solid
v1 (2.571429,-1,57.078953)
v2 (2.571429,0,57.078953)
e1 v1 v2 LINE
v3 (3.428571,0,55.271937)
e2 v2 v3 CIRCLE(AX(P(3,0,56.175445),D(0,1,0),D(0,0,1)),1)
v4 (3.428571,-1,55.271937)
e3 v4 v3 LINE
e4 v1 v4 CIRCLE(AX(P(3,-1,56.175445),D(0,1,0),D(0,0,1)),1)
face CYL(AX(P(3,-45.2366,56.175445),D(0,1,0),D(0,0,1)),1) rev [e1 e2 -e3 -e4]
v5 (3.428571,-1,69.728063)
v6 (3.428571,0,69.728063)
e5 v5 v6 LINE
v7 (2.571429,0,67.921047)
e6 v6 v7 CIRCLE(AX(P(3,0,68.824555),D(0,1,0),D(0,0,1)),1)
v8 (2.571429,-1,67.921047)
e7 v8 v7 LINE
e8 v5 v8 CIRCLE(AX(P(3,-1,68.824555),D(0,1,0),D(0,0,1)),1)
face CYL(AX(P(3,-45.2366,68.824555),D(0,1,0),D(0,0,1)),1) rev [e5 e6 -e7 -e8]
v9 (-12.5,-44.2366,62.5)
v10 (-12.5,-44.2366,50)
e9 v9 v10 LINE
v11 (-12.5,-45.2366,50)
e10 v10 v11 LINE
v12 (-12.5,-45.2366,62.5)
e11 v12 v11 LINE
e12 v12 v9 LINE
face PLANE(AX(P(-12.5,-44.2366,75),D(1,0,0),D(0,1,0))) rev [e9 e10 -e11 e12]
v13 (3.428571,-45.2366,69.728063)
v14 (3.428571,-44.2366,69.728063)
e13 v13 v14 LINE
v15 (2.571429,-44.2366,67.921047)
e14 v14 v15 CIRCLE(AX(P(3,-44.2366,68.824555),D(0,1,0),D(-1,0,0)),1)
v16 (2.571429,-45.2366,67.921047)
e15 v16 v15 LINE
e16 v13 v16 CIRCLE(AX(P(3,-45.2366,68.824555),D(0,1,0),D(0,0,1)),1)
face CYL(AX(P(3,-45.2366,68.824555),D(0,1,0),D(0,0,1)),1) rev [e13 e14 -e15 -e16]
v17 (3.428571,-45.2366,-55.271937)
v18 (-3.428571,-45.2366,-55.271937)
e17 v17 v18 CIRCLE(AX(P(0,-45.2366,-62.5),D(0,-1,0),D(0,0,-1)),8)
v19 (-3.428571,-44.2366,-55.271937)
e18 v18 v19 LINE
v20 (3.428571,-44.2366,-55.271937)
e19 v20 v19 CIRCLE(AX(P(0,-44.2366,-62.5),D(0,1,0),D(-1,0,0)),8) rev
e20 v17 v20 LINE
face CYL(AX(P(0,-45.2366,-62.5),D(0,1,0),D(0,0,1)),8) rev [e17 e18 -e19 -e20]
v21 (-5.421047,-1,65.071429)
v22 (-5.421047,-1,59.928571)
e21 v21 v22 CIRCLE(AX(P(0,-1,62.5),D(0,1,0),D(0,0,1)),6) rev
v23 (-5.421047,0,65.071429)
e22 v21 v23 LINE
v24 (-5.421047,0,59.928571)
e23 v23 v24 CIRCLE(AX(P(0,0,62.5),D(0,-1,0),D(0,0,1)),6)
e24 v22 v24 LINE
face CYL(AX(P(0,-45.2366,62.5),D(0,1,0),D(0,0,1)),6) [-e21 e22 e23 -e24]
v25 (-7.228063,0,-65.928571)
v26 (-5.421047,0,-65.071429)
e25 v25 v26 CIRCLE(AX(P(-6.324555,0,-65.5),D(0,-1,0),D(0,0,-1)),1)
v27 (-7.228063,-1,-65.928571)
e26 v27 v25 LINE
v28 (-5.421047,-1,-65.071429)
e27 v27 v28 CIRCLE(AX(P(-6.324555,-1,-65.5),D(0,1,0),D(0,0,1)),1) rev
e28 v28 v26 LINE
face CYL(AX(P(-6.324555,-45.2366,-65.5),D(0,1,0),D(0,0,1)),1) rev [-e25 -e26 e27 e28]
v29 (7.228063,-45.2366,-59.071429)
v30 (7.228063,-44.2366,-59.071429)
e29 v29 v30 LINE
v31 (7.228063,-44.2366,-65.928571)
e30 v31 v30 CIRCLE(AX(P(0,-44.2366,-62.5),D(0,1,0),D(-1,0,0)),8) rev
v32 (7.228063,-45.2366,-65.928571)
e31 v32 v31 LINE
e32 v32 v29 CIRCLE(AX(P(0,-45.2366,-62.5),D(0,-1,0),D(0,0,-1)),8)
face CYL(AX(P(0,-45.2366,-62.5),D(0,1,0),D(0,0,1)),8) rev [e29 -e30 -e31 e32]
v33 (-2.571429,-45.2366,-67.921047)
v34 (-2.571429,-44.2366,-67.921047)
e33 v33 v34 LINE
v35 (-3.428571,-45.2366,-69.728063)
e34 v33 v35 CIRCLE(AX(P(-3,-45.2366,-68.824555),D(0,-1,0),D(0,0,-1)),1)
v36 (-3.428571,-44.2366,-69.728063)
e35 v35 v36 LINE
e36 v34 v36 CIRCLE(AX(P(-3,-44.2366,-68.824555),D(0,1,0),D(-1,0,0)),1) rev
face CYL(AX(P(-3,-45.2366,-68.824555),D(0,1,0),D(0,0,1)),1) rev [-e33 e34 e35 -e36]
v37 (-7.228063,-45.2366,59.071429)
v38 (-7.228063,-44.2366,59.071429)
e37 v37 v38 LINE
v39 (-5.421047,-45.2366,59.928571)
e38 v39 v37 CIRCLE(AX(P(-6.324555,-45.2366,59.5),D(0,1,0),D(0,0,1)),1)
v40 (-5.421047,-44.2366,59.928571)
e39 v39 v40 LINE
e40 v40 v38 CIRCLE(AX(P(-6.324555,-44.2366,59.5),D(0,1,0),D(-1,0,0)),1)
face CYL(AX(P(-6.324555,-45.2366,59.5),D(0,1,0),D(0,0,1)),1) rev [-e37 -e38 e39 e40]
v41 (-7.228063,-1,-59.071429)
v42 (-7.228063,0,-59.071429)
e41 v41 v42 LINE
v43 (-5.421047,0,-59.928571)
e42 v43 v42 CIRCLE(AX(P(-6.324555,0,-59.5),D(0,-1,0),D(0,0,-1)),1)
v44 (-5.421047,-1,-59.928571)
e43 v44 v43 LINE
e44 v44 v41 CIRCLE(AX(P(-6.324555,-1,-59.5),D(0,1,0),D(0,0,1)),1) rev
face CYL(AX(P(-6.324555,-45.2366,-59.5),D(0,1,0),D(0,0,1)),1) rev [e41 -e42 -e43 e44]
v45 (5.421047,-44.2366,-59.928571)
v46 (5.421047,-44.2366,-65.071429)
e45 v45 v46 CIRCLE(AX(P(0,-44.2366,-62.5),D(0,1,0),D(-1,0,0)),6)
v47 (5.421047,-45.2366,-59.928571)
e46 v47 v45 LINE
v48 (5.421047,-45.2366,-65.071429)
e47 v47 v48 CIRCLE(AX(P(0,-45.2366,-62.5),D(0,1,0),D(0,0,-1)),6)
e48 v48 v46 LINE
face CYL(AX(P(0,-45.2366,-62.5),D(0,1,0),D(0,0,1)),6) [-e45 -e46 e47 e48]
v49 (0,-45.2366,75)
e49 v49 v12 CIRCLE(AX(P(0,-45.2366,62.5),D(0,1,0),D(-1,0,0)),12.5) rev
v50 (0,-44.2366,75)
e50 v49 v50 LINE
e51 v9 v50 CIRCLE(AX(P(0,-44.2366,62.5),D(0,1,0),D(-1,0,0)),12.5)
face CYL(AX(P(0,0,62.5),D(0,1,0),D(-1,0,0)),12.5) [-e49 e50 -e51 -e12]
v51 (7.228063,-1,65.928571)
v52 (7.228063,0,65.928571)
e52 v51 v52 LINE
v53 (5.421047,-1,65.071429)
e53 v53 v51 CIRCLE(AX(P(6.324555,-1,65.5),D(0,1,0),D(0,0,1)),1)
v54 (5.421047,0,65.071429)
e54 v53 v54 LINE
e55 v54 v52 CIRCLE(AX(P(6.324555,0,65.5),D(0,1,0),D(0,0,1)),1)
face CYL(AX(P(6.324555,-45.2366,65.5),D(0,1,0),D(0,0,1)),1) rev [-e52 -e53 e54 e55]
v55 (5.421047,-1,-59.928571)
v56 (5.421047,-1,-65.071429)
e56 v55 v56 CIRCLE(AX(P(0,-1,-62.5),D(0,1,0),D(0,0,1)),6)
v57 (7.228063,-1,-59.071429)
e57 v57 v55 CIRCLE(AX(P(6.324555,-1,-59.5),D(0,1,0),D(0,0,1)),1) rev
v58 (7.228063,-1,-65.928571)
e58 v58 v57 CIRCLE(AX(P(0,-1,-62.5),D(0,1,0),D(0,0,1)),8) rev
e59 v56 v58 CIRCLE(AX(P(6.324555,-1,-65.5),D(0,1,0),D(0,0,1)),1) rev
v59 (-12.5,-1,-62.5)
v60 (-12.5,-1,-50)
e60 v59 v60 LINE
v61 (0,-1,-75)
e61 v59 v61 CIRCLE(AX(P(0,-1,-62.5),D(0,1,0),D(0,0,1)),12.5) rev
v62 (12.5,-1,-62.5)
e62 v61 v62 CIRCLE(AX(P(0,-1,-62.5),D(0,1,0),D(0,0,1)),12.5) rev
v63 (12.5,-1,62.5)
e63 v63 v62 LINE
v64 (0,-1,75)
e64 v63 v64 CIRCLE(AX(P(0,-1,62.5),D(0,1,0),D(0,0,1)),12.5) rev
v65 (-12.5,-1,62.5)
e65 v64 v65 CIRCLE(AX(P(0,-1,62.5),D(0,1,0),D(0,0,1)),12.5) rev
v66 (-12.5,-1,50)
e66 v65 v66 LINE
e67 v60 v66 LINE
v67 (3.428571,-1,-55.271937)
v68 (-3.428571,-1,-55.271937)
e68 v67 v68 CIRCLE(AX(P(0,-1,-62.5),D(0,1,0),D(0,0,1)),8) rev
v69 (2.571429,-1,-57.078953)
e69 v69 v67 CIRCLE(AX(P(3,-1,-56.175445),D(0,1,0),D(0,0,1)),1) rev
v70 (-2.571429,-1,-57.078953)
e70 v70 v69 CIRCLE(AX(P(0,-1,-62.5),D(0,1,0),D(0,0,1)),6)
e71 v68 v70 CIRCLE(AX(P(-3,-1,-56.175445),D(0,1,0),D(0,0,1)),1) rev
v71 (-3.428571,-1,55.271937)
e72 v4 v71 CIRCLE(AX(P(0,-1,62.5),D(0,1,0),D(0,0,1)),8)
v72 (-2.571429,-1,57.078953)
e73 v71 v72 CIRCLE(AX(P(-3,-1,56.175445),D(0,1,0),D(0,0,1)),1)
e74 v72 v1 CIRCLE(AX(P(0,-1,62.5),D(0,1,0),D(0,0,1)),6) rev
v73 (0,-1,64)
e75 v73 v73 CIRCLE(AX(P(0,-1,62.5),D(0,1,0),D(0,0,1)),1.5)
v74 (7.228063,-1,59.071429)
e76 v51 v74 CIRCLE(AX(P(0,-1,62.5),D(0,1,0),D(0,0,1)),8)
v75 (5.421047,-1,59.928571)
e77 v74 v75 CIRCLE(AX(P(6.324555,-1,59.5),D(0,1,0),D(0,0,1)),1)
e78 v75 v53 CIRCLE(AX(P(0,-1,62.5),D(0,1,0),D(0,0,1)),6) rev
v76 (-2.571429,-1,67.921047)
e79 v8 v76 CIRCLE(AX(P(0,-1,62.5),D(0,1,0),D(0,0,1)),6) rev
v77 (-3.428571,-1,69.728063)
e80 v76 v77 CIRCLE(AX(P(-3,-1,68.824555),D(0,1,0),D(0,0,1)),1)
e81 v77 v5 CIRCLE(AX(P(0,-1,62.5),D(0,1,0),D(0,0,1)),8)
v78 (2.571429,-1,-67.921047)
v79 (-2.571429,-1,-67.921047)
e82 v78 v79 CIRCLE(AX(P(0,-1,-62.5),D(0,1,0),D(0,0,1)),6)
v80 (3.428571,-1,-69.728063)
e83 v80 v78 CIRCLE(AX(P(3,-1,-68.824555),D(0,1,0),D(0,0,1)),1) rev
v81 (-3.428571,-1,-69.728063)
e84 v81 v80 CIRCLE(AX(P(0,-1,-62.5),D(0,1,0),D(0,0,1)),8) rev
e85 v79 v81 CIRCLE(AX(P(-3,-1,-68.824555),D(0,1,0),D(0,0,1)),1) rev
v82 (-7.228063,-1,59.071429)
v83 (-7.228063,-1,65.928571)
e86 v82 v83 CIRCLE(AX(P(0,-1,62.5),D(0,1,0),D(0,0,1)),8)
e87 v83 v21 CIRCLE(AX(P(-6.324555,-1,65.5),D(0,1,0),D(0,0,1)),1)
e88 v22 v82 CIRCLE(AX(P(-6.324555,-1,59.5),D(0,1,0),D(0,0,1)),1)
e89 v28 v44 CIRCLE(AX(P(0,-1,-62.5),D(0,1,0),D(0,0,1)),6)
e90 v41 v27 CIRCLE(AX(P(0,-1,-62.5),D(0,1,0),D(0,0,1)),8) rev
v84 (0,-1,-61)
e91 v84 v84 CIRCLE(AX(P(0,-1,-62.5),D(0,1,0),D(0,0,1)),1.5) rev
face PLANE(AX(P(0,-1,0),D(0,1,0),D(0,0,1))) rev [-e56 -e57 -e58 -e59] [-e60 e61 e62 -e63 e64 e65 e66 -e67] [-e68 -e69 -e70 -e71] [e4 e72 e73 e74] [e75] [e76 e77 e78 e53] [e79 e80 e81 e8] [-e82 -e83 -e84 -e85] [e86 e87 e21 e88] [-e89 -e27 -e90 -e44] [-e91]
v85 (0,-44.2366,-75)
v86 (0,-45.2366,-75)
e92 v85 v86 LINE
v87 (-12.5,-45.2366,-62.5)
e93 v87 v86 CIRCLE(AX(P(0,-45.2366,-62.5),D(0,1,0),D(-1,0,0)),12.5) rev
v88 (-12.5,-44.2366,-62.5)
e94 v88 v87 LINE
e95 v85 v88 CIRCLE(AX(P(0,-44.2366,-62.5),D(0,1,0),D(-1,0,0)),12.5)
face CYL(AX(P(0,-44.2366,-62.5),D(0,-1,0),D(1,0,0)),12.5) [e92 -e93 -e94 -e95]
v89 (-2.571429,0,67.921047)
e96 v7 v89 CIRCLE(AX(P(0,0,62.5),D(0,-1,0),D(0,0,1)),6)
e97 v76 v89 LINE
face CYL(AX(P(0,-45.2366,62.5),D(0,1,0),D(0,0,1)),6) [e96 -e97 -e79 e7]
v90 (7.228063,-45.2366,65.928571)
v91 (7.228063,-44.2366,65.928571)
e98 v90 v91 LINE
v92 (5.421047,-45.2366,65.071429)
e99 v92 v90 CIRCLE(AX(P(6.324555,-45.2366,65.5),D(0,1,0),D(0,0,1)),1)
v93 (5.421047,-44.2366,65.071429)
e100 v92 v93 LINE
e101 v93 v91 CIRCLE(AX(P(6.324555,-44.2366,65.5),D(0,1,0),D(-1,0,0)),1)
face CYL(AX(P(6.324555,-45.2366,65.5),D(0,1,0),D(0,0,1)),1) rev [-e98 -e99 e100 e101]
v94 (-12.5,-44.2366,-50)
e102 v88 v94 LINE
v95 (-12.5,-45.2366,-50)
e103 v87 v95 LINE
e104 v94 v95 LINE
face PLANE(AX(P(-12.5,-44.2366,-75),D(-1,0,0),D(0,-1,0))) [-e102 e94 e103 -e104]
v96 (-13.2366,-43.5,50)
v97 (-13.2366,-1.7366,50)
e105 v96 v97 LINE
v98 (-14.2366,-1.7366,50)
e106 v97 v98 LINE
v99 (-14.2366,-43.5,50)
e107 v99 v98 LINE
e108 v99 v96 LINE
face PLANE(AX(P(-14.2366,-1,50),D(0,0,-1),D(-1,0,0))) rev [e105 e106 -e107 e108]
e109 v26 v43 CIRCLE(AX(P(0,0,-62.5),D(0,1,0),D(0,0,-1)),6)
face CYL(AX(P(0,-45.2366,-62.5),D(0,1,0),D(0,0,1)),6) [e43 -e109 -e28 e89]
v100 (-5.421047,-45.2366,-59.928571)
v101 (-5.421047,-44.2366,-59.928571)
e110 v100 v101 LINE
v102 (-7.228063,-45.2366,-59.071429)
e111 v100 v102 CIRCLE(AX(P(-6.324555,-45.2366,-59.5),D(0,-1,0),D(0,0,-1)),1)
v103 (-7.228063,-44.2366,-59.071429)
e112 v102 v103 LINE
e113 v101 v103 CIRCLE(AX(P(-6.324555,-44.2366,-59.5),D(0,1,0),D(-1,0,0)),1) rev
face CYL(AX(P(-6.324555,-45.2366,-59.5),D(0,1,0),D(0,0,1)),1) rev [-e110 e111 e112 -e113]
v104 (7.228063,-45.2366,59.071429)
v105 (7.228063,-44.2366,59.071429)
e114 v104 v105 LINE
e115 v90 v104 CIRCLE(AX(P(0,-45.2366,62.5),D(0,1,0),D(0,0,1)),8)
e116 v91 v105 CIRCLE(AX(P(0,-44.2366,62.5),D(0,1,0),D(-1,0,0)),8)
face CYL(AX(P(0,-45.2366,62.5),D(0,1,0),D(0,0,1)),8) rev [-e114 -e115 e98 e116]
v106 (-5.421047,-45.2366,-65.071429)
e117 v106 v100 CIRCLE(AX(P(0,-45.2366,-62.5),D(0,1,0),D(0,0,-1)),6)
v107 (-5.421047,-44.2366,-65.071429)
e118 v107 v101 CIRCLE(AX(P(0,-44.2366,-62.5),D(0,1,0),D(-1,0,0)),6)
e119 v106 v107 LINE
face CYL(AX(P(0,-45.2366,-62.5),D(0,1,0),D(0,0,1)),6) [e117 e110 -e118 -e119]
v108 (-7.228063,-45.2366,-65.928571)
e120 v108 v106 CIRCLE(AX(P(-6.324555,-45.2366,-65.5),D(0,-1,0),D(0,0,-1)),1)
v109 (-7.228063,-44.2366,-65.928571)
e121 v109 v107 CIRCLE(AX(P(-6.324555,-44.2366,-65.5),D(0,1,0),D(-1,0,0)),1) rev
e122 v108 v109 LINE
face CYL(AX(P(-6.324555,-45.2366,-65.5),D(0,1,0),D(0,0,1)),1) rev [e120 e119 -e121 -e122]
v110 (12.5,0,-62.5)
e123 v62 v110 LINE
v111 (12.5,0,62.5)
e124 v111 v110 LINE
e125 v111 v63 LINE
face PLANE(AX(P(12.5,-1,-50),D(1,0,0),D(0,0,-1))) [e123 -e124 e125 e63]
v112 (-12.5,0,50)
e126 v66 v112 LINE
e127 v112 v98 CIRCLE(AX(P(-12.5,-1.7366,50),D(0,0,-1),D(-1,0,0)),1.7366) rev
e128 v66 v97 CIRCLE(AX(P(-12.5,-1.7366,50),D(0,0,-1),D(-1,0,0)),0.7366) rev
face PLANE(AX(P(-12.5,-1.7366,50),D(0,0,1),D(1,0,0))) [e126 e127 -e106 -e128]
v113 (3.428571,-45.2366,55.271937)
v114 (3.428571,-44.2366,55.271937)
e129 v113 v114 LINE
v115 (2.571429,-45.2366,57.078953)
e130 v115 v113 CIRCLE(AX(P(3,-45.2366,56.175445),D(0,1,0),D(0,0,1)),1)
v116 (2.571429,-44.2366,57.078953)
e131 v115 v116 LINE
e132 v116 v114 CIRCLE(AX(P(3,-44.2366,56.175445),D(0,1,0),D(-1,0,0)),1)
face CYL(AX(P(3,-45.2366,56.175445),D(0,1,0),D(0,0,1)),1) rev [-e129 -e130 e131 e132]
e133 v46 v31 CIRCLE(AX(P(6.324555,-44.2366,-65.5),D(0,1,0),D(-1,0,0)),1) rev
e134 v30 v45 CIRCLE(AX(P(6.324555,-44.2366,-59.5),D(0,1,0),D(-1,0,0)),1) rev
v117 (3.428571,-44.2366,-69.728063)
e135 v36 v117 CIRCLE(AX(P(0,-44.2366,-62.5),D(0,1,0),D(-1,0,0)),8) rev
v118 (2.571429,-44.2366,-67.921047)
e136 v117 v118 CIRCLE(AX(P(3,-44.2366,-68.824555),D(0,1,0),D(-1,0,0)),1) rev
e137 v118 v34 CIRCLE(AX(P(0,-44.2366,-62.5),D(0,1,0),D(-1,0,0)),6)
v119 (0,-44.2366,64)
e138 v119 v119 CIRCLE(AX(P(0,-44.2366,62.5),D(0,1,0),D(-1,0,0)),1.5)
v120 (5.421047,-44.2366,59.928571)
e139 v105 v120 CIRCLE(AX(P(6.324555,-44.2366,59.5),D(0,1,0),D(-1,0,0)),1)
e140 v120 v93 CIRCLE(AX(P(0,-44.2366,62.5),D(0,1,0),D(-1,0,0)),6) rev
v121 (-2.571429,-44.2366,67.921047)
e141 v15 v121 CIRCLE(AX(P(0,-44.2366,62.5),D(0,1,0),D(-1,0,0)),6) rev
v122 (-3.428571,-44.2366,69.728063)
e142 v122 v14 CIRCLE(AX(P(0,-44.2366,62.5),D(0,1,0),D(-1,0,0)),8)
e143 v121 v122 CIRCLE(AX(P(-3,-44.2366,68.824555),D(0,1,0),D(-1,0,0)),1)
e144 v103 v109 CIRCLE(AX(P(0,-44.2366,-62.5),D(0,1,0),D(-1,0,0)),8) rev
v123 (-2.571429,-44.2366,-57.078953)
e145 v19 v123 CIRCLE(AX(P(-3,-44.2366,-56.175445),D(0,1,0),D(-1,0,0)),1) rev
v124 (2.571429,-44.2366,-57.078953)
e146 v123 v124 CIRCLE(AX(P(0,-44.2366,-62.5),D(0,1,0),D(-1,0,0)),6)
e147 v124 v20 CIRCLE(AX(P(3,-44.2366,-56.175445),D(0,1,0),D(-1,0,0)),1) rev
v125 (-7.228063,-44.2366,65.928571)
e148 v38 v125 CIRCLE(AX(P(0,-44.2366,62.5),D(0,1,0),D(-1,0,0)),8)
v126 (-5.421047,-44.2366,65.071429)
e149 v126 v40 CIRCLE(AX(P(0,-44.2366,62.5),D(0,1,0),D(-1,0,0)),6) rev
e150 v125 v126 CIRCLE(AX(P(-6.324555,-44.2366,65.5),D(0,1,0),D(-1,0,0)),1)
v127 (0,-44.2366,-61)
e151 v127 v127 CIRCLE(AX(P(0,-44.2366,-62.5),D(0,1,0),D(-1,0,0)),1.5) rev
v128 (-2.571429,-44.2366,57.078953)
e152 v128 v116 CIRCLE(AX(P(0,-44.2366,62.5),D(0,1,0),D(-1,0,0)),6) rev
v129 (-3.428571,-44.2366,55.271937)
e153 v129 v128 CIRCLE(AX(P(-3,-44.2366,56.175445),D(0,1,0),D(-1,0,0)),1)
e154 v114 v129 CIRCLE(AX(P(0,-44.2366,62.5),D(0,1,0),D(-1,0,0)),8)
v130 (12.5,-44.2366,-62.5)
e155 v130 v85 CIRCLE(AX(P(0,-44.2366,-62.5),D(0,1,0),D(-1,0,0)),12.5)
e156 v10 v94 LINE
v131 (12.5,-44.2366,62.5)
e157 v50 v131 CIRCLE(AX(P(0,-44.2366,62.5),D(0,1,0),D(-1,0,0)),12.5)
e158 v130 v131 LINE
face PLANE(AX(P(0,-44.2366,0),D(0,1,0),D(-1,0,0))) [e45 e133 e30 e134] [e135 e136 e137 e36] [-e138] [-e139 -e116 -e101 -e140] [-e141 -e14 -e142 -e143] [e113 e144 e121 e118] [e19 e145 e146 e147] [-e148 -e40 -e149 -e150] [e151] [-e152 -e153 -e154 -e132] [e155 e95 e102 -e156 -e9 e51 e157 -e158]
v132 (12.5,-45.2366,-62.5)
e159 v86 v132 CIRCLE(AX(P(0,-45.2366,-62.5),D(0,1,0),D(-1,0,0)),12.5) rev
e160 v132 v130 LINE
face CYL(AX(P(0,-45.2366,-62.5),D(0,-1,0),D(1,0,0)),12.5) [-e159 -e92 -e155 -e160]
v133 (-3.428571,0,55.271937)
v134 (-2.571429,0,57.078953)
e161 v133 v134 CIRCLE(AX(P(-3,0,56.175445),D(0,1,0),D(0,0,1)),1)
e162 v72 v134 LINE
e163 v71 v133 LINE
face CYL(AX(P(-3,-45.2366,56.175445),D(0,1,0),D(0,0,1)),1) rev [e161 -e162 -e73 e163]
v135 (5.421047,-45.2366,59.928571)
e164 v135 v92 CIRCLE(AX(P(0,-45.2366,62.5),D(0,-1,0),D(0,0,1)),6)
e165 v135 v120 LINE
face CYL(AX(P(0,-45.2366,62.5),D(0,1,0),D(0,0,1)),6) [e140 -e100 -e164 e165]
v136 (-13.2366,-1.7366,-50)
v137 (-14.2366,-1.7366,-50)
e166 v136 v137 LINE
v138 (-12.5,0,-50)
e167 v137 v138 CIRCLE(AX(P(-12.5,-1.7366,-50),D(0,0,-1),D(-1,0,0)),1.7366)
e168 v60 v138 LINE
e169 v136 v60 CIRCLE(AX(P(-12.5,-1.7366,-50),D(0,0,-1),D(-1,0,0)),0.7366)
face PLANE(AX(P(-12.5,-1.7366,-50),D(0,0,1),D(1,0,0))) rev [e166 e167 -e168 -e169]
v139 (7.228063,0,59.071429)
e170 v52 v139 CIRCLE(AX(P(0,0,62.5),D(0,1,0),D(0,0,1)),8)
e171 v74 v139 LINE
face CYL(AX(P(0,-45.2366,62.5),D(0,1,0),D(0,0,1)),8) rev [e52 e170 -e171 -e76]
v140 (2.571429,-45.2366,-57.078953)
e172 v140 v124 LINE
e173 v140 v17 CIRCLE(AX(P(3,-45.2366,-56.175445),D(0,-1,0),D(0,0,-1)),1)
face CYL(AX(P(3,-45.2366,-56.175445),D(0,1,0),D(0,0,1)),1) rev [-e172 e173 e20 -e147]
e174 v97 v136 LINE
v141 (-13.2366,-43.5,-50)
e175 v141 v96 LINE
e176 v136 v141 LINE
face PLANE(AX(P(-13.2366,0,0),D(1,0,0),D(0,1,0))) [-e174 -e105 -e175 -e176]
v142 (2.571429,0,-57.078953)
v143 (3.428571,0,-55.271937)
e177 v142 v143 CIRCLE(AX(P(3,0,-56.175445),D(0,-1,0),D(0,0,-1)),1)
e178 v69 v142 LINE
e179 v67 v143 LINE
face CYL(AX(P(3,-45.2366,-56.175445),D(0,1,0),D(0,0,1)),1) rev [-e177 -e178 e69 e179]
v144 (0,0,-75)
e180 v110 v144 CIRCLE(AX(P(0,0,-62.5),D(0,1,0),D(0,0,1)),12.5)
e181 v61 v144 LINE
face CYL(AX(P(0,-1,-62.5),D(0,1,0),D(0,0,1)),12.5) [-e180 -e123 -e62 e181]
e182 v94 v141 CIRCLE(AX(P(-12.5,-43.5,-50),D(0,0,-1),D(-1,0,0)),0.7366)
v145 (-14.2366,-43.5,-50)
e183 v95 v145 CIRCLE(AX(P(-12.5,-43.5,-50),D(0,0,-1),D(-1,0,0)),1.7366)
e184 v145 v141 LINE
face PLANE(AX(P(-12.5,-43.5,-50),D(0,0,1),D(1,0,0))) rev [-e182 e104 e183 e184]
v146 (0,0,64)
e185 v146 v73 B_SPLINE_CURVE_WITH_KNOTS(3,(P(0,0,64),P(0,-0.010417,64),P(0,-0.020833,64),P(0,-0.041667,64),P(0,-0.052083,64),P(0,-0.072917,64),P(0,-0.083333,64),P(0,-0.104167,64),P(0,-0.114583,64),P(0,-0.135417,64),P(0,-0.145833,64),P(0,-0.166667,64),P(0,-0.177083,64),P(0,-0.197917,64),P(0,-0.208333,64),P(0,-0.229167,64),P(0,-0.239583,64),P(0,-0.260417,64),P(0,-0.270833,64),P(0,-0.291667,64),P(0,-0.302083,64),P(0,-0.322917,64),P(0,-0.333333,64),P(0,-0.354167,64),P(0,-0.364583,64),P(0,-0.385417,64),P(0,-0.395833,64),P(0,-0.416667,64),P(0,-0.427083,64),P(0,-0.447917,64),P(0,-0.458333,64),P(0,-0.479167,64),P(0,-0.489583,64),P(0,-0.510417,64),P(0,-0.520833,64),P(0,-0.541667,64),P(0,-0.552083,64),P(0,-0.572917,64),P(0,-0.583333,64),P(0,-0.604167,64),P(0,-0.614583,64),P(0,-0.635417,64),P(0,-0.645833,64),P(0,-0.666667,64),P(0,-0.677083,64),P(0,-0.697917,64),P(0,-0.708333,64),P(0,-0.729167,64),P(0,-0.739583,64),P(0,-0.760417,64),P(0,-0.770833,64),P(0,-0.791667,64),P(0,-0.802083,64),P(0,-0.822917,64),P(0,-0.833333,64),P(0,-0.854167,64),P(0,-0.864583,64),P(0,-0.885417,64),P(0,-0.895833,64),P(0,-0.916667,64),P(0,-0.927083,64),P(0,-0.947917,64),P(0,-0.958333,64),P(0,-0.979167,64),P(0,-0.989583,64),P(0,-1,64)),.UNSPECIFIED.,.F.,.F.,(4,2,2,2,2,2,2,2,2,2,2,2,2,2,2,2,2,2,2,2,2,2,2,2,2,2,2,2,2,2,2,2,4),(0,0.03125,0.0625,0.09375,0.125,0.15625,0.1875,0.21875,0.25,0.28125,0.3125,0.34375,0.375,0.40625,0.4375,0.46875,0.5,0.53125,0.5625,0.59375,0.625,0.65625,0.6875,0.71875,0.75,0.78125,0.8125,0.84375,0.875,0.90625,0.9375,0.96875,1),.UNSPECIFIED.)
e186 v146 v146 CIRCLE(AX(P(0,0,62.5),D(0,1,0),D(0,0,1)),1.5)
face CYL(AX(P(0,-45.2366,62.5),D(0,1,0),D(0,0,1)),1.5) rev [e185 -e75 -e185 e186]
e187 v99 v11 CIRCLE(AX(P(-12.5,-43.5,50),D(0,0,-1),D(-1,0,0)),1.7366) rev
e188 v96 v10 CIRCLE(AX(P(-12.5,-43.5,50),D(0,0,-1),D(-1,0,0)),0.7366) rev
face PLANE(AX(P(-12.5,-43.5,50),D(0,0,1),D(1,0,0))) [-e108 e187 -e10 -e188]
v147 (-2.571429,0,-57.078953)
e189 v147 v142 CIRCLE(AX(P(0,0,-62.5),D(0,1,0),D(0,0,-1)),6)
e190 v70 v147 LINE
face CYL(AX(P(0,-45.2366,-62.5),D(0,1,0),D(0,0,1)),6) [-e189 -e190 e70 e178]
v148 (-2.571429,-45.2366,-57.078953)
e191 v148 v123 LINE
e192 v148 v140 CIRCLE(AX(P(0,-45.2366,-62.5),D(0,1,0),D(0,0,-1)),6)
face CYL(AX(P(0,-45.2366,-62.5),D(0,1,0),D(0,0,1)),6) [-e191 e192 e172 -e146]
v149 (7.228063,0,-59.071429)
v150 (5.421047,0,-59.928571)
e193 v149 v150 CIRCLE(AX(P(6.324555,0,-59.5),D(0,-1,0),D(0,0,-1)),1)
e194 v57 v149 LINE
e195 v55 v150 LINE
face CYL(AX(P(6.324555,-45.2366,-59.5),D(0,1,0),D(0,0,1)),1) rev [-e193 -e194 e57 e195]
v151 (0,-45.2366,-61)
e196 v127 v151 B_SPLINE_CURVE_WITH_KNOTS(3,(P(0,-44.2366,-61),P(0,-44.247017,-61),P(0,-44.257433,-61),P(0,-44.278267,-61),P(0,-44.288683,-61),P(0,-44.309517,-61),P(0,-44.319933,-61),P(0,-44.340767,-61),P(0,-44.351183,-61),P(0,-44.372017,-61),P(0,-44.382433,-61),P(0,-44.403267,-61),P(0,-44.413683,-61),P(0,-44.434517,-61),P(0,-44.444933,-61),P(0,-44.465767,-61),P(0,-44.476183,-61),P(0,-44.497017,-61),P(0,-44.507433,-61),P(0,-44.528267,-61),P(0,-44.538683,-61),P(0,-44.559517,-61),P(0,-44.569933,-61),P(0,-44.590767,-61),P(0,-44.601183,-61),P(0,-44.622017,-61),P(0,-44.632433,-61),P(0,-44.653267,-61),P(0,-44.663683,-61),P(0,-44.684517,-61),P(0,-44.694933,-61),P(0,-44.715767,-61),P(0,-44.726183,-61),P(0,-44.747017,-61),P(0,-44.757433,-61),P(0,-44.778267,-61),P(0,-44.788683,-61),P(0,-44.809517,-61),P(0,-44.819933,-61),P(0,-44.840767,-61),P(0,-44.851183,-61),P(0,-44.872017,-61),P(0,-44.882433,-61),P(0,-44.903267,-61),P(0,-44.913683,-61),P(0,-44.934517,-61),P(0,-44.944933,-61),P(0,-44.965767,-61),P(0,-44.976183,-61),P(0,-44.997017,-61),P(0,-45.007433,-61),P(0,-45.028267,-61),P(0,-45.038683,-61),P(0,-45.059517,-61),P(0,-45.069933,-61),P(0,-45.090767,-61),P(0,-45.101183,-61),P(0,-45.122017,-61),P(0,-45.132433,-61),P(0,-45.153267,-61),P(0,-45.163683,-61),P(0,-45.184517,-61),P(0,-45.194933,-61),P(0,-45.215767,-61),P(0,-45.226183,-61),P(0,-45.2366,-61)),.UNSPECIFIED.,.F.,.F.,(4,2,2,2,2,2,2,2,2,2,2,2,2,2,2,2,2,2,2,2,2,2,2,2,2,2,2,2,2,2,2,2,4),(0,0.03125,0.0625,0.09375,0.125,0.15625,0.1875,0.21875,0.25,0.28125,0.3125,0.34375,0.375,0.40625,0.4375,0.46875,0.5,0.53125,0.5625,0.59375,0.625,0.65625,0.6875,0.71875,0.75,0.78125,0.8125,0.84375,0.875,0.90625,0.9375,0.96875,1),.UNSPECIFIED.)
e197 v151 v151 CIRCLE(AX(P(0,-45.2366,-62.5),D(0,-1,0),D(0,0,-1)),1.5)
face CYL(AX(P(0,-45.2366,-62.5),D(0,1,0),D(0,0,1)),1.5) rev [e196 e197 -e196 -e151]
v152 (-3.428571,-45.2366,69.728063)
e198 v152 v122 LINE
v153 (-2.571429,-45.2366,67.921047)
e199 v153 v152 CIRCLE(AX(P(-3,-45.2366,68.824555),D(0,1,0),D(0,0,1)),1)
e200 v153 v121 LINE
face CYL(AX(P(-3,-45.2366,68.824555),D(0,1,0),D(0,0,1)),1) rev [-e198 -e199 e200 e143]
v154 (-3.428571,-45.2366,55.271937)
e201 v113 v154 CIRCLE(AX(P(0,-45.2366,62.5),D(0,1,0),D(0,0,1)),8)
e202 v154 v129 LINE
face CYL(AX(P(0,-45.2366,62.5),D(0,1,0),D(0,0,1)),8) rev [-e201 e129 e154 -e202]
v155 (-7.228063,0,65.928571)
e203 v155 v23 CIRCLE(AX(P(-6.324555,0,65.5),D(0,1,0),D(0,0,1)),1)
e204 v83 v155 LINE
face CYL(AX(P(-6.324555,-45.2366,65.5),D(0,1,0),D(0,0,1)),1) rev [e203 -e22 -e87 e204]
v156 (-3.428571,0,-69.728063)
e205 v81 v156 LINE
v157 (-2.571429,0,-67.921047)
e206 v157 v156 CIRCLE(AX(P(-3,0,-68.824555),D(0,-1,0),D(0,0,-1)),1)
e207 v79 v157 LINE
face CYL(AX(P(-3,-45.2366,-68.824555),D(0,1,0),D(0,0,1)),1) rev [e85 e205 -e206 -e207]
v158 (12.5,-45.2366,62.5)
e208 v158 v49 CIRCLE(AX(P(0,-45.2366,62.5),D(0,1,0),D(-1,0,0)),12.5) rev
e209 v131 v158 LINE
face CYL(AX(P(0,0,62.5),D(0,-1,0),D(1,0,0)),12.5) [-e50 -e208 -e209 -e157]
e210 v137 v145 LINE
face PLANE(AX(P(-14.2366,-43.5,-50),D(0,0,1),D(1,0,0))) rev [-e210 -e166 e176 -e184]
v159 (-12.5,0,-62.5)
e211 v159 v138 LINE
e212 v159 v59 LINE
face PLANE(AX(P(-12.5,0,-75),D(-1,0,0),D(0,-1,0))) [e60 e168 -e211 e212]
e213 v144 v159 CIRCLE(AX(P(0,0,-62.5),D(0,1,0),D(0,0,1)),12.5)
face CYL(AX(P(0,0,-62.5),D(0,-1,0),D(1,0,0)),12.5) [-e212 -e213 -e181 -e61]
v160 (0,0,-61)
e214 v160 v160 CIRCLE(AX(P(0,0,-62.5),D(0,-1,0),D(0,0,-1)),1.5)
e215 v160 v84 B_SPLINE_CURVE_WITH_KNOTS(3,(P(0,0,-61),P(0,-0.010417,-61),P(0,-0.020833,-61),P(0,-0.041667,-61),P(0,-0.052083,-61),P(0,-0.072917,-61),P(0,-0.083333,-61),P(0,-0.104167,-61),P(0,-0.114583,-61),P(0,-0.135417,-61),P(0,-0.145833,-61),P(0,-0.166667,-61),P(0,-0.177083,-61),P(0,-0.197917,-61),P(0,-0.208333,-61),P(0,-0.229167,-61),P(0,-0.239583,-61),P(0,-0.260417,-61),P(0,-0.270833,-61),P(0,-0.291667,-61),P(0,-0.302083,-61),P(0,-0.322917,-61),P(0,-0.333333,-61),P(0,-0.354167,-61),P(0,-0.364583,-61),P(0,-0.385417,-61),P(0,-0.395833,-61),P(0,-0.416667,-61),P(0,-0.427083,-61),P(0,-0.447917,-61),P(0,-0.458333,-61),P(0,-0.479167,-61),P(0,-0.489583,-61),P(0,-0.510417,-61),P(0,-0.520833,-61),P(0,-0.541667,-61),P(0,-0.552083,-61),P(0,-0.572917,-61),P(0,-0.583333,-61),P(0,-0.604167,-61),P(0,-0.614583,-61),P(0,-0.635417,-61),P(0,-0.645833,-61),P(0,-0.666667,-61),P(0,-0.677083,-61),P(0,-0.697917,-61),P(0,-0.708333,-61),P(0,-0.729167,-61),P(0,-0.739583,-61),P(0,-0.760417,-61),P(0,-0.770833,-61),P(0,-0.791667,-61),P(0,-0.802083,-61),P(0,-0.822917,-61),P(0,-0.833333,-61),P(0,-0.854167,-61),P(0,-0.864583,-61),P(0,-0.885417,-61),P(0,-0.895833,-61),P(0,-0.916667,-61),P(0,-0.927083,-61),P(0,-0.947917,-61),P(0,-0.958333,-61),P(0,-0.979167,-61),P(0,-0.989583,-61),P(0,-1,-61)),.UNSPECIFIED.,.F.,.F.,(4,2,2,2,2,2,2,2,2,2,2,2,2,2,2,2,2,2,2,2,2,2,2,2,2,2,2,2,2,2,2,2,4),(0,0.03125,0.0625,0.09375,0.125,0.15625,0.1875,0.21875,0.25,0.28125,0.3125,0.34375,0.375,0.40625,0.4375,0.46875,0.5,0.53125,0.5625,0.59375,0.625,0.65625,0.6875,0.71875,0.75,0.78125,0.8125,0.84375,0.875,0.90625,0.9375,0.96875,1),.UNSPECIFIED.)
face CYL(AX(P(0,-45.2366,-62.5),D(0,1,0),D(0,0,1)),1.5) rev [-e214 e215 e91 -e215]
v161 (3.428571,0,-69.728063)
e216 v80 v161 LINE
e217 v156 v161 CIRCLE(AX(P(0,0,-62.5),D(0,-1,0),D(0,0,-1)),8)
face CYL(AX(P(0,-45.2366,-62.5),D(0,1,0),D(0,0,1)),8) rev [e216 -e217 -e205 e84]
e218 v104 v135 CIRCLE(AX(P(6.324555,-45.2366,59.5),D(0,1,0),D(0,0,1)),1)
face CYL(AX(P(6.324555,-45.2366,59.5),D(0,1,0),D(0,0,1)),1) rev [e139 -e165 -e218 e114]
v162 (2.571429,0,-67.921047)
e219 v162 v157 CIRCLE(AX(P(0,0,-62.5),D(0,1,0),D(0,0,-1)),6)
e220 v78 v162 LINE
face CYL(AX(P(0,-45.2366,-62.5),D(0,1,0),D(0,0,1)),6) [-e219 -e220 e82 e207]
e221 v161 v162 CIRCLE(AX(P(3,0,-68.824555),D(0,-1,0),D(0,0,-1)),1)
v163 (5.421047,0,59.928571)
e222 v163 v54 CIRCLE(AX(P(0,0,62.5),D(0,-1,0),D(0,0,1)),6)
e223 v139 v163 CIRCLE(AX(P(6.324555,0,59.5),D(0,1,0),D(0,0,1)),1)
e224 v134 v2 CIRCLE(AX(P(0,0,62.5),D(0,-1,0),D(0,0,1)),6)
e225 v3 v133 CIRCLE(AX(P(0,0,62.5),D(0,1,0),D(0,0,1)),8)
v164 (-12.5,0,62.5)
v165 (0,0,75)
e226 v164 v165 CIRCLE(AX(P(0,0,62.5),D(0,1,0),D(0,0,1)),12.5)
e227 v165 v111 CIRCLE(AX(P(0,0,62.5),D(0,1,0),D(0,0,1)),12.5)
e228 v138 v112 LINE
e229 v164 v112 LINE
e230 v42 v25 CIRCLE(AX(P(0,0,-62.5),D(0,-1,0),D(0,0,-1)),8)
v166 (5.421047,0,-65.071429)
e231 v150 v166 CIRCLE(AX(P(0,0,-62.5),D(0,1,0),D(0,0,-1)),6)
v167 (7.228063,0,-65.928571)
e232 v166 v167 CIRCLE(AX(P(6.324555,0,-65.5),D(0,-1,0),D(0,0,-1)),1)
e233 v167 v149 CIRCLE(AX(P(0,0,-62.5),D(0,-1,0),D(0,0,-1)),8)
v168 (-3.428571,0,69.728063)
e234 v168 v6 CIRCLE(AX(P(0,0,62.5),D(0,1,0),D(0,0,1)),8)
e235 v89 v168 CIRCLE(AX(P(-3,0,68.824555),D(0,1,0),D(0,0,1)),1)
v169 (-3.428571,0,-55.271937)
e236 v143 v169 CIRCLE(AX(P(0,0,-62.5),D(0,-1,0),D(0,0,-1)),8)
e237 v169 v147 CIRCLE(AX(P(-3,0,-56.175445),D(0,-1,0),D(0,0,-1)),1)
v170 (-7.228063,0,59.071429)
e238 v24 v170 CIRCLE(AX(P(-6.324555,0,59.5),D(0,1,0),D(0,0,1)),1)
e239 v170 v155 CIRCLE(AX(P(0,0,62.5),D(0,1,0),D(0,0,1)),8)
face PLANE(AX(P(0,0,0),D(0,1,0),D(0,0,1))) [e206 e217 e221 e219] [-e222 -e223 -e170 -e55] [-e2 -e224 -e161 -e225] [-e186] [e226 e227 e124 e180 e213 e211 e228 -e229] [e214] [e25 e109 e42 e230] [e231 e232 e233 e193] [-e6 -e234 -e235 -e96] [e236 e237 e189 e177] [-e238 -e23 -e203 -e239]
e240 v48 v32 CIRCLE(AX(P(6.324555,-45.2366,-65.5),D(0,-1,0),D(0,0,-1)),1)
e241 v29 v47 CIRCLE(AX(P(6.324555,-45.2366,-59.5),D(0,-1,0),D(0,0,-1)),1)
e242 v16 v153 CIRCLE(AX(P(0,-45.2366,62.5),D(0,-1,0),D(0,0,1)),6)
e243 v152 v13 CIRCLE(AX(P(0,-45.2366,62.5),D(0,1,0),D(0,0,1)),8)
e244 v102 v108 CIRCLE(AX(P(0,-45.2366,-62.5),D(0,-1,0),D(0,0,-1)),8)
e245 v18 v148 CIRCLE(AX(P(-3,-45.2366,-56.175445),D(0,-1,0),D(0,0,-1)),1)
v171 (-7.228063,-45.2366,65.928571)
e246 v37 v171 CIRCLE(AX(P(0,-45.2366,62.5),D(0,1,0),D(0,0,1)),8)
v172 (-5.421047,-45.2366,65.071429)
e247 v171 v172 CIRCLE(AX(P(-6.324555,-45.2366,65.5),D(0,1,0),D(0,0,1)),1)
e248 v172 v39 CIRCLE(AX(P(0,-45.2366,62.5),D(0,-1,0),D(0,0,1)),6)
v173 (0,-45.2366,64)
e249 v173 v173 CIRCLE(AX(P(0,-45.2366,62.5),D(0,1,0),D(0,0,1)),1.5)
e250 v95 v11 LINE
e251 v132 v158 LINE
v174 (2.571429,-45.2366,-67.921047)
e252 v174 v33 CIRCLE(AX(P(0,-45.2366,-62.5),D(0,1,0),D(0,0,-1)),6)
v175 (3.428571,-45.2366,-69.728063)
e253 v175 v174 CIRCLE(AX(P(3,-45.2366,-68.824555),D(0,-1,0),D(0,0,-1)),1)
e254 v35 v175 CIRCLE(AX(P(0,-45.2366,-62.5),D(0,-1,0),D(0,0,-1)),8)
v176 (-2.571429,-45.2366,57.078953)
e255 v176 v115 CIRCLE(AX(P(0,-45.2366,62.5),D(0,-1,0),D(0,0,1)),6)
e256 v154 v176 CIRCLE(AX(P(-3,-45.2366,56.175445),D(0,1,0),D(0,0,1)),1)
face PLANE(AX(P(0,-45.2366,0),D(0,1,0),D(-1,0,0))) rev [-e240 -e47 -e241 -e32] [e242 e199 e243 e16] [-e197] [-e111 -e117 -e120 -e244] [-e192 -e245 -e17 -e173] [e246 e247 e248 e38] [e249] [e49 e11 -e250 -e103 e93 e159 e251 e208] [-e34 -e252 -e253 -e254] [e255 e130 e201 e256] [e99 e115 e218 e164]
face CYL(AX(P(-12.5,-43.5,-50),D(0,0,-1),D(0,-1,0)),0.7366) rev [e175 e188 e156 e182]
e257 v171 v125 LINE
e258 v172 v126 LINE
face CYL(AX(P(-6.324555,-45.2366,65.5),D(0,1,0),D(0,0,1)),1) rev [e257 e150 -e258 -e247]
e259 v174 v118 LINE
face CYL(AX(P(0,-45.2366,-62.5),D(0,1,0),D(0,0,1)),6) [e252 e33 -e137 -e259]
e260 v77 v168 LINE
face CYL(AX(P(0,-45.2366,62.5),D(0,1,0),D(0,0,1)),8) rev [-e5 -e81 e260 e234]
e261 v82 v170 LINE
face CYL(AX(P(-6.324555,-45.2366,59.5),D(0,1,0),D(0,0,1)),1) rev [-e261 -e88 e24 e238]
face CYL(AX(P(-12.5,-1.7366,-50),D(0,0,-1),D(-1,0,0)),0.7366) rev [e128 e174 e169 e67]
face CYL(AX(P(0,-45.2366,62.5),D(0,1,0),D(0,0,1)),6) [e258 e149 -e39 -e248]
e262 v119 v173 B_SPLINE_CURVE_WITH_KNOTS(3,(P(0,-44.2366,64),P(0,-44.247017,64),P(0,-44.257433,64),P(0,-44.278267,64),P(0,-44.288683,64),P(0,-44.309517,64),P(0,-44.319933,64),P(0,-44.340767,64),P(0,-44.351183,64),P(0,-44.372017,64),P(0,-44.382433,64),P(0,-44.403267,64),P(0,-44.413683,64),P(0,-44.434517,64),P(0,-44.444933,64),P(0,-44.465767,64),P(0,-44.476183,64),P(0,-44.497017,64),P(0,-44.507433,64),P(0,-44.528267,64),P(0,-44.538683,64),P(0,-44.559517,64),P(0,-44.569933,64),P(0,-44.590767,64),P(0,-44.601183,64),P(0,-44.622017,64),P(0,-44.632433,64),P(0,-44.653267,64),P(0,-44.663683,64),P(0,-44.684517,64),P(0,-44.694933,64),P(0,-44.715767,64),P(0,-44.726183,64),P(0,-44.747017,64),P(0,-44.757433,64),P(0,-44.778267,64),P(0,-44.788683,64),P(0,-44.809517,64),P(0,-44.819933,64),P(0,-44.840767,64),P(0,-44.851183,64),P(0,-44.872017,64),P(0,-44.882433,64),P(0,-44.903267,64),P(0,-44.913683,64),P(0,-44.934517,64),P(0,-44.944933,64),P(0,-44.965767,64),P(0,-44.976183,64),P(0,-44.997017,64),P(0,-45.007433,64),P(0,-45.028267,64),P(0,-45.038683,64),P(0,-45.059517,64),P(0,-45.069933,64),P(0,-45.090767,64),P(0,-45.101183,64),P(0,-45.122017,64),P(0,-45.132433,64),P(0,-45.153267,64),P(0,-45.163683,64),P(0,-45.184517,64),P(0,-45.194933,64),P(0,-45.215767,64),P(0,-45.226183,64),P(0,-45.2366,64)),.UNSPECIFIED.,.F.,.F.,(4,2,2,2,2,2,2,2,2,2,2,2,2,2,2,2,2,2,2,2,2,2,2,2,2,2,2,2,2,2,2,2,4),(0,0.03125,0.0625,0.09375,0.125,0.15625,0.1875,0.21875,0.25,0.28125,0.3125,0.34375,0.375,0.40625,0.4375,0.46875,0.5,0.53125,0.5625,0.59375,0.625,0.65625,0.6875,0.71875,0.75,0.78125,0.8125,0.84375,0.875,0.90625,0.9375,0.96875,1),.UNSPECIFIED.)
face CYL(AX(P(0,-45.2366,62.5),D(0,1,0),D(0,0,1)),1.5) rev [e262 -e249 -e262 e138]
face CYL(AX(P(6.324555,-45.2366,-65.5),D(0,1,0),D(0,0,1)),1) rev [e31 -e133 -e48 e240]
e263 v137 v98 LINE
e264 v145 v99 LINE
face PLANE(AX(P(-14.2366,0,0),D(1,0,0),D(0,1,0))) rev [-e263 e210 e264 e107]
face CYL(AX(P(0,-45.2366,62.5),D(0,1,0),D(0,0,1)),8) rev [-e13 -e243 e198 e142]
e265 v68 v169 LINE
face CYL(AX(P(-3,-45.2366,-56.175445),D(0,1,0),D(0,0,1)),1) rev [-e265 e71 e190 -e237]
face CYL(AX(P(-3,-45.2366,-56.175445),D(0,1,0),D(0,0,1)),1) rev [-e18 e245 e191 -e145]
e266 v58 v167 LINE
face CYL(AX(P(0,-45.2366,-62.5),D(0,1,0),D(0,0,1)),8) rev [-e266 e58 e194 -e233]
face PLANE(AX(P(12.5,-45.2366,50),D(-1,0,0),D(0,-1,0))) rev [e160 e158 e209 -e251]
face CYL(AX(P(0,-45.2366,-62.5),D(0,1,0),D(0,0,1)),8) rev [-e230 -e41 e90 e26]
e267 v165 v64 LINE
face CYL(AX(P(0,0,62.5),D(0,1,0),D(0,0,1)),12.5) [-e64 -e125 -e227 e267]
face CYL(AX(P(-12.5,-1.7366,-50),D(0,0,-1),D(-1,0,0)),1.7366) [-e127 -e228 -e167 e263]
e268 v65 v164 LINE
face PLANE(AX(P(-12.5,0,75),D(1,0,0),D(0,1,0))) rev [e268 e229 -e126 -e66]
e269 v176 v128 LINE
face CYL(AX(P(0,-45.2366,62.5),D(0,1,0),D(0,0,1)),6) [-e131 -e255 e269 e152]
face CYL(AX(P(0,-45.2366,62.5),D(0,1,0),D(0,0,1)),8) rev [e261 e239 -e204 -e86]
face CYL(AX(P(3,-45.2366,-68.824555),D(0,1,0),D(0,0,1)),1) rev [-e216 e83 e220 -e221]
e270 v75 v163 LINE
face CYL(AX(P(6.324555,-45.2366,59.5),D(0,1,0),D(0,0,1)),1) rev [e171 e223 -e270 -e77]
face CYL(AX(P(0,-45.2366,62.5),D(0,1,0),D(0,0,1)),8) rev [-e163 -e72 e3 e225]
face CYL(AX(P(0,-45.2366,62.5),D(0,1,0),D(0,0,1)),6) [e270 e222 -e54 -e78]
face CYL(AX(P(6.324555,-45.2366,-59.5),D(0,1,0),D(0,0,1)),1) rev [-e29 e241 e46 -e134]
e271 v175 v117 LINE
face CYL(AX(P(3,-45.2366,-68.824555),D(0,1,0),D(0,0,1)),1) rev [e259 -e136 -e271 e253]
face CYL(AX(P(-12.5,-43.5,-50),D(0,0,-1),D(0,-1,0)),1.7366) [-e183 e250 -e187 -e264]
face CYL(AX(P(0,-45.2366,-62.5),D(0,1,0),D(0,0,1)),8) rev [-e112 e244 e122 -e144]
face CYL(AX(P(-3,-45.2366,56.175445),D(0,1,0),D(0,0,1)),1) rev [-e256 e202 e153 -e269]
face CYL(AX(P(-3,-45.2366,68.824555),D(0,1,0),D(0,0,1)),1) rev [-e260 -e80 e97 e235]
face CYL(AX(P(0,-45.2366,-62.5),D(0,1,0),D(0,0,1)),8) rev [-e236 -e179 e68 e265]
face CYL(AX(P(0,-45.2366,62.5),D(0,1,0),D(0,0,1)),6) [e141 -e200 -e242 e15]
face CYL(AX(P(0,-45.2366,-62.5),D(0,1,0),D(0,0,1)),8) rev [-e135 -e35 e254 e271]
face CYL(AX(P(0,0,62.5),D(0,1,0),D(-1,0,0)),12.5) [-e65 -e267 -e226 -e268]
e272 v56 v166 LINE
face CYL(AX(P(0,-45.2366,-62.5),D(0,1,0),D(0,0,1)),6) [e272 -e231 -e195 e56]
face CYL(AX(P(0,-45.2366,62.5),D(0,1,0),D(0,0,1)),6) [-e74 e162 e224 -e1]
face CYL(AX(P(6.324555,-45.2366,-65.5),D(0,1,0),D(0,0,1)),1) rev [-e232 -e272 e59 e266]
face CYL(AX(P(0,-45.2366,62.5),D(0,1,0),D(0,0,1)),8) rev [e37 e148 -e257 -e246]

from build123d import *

# Parameters (mm, degrees)
SKETCH_1_W             = 25
SKETCH_1_H             = 100
SM_BASE_FLANGE_1_DEPTH = 1
SM_EDGE_FLANGE_1_DEPTH = 100
SM_EDGE_FLANGE_2_DEPTH = 100
SKETCH_18_W            = 25
SKETCH_18_H            = 1
EXTRUDE_1_DEPTH        = 25
FILLET_1_R             = 12.5
SKETCH_21_R            = 1.5
CUT_EXTRUDE_1_DEPTH    = 89.735735525
FILLET_1_OF_MIRROR_1_R = 12.5


# Sheet-metal steps are written as plain solids
with BuildPart() as part:
    # Sketch 1 → 基材-凸緣1 (new body)
    with BuildSketch(Plane(origin=(0, 0, 0), x_dir=(1, 0, 0), z_dir=(0, 1, 0))):
        Rectangle(SKETCH_1_W, SKETCH_1_H)
    extrude(amount=-SM_BASE_FLANGE_1_DEPTH)

    # 邊線-凸緣1 section (across the edge) → 邊線-凸緣1 (add)
    with BuildSketch(Plane(origin=(-13.2366, -1, 50), x_dir=(1, 0, 0), z_dir=(0, 0, -1))):
        with BuildLine():
            Line((-1, 0.7366), (-1, 42.5))
            Line((-1, 42.5), (0, 42.5))
            Line((0, 42.5), (0, 0.7366))
            ThreePointArc((0, 0.7366), (0.215745145, 0.215745145), (0.7366, 0))
            Line((0.7366, 0), (0.7366, -1))
            ThreePointArc((0.7366, -1), (-0.491361636, -0.491361636), (-1, 0.7366))
        make_face()
    extrude(amount=SM_EDGE_FLANGE_1_DEPTH)

    # 邊線-凸緣2 section (across the edge) → 邊線-凸緣2 (add)
    with BuildSketch(Plane(origin=(-13.2366, -44.2366, 50), x_dir=(0, 1, 0), z_dir=(0, 0, -1))):
        with BuildLine():
            Line((-1, 0.7366), (-1, 25.7366))
            Line((-1, 25.7366), (0, 25.7366))
            Line((0, 25.7366), (0, 0.7366))
            ThreePointArc((0, 0.7366), (0.215745145, 0.215745145), (0.7366, 0))
            Line((0.7366, 0), (0.7366, -1))
            ThreePointArc((0.7366, -1), (-0.491361636, -0.491361636), (-1, 0.7366))
        make_face()
    extrude(amount=SM_EDGE_FLANGE_2_DEPTH)

    # 草圖18 → 填料-伸長1 (add)
    with BuildSketch(Plane.XY.offset(50)):
        with Locations((0, -0.5)):
            Rectangle(SKETCH_18_W, SKETCH_18_H)
        with Locations((0, -44.7366)):
            Rectangle(SKETCH_18_W, SKETCH_18_H)
    extrude_1 = extrude(amount=EXTRUDE_1_DEPTH)

    # 圓角1
    fillet_1_edges = [part.edges().sort_by_distance(p)[0] for p in [
        (-12.5, -44.7366, 75),
        (12.5, -44.7366, 75),
        (12.5, -0.5, 75),
        (-12.5, -0.5, 75),
    ]]
    fillet(fillet_1_edges, radius=FILLET_1_R - 0.0001)  # a hair under: the kernel refuses the full size

    # 草圖21 → 除料-伸長1 (cut, through all)
    with BuildSketch(Plane(origin=(0, 0, 0), x_dir=(1, 0, 0), z_dir=(0, 1, 0))):
        with Locations(Location((0, -62.5, 0), (0, 0, 270))):
            Circle(SKETCH_21_R)
        with BuildLine():
            ThreePointArc((3.428571429, -55.271936777), (0, -54.5), (-3.428571429, -55.271936777))
            ThreePointArc((-3.428571429, -55.271936777), (-3.903507903, -56.604016108), (-2.571428571, -57.078952583))
            ThreePointArc((-2.571428571, -57.078952583), (0, -56.5), (2.571428571, -57.078952583))
            ThreePointArc((2.571428571, -57.078952583), (3.903507903, -56.604016108), (3.428571429, -55.271936777))
        make_face()
        with BuildLine():
            ThreePointArc((5.421047417, -65.071428571), (6, -62.5), (5.421047417, -59.928571429))
            ThreePointArc((5.421047417, -59.928571429), (5.895983892, -58.596492097), (7.228063223, -59.071428571))
            ThreePointArc((7.228063223, -59.071428571), (8, -62.5), (7.228063223, -65.928571429))
            ThreePointArc((7.228063223, -65.928571429), (5.895983892, -66.403507903), (5.421047417, -65.071428571))
        make_face()
        with BuildLine():
            ThreePointArc((-2.571428571, -67.921047417), (0, -68.5), (2.571428571, -67.921047417))
            ThreePointArc((2.571428571, -67.921047417), (3.903507903, -68.395983892), (3.428571429, -69.728063223))
            ThreePointArc((3.428571429, -69.728063223), (0, -70.5), (-3.428571429, -69.728063223))
            ThreePointArc((-3.428571429, -69.728063223), (-3.903507903, -68.395983892), (-2.571428571, -67.921047417))
        make_face()
        with BuildLine():
            ThreePointArc((-5.421047417, -59.928571429), (-6, -62.5), (-5.421047417, -65.071428571))
            ThreePointArc((-5.421047417, -65.071428571), (-5.895983892, -66.403507903), (-7.228063223, -65.928571429))
            ThreePointArc((-7.228063223, -65.928571429), (-8, -62.5), (-7.228063223, -59.071428571))
            ThreePointArc((-7.228063223, -59.071428571), (-5.895983892, -58.596492097), (-5.421047417, -59.928571429))
        make_face()
    cut_extrude_1 = extrude(amount=-CUT_EXTRUDE_1_DEPTH, mode=Mode.SUBTRACT)

    # 鏡射1: 填料-伸長1, 除料-伸長1 across plane
    add(extrude_1.mirror(Plane.XY))
    add(cut_extrude_1.mirror(Plane.XY), mode=Mode.SUBTRACT)

    # 圓角1 of 鏡射1
    fillet_1_of_mirror_1_edges = [part.edges().sort_by_distance(p)[0] for p in [
        (-12.5, -44.7366, -75),
        (12.5, -44.7366, -75),
        (12.5, -0.5, -75),
        (-12.5, -0.5, -75),
    ]]
    fillet(fillet_1_of_mirror_1_edges, radius=FILLET_1_OF_MIRROR_1_R - 0.0001)  # a hair under: the kernel refuses the full size


solid = part.part
